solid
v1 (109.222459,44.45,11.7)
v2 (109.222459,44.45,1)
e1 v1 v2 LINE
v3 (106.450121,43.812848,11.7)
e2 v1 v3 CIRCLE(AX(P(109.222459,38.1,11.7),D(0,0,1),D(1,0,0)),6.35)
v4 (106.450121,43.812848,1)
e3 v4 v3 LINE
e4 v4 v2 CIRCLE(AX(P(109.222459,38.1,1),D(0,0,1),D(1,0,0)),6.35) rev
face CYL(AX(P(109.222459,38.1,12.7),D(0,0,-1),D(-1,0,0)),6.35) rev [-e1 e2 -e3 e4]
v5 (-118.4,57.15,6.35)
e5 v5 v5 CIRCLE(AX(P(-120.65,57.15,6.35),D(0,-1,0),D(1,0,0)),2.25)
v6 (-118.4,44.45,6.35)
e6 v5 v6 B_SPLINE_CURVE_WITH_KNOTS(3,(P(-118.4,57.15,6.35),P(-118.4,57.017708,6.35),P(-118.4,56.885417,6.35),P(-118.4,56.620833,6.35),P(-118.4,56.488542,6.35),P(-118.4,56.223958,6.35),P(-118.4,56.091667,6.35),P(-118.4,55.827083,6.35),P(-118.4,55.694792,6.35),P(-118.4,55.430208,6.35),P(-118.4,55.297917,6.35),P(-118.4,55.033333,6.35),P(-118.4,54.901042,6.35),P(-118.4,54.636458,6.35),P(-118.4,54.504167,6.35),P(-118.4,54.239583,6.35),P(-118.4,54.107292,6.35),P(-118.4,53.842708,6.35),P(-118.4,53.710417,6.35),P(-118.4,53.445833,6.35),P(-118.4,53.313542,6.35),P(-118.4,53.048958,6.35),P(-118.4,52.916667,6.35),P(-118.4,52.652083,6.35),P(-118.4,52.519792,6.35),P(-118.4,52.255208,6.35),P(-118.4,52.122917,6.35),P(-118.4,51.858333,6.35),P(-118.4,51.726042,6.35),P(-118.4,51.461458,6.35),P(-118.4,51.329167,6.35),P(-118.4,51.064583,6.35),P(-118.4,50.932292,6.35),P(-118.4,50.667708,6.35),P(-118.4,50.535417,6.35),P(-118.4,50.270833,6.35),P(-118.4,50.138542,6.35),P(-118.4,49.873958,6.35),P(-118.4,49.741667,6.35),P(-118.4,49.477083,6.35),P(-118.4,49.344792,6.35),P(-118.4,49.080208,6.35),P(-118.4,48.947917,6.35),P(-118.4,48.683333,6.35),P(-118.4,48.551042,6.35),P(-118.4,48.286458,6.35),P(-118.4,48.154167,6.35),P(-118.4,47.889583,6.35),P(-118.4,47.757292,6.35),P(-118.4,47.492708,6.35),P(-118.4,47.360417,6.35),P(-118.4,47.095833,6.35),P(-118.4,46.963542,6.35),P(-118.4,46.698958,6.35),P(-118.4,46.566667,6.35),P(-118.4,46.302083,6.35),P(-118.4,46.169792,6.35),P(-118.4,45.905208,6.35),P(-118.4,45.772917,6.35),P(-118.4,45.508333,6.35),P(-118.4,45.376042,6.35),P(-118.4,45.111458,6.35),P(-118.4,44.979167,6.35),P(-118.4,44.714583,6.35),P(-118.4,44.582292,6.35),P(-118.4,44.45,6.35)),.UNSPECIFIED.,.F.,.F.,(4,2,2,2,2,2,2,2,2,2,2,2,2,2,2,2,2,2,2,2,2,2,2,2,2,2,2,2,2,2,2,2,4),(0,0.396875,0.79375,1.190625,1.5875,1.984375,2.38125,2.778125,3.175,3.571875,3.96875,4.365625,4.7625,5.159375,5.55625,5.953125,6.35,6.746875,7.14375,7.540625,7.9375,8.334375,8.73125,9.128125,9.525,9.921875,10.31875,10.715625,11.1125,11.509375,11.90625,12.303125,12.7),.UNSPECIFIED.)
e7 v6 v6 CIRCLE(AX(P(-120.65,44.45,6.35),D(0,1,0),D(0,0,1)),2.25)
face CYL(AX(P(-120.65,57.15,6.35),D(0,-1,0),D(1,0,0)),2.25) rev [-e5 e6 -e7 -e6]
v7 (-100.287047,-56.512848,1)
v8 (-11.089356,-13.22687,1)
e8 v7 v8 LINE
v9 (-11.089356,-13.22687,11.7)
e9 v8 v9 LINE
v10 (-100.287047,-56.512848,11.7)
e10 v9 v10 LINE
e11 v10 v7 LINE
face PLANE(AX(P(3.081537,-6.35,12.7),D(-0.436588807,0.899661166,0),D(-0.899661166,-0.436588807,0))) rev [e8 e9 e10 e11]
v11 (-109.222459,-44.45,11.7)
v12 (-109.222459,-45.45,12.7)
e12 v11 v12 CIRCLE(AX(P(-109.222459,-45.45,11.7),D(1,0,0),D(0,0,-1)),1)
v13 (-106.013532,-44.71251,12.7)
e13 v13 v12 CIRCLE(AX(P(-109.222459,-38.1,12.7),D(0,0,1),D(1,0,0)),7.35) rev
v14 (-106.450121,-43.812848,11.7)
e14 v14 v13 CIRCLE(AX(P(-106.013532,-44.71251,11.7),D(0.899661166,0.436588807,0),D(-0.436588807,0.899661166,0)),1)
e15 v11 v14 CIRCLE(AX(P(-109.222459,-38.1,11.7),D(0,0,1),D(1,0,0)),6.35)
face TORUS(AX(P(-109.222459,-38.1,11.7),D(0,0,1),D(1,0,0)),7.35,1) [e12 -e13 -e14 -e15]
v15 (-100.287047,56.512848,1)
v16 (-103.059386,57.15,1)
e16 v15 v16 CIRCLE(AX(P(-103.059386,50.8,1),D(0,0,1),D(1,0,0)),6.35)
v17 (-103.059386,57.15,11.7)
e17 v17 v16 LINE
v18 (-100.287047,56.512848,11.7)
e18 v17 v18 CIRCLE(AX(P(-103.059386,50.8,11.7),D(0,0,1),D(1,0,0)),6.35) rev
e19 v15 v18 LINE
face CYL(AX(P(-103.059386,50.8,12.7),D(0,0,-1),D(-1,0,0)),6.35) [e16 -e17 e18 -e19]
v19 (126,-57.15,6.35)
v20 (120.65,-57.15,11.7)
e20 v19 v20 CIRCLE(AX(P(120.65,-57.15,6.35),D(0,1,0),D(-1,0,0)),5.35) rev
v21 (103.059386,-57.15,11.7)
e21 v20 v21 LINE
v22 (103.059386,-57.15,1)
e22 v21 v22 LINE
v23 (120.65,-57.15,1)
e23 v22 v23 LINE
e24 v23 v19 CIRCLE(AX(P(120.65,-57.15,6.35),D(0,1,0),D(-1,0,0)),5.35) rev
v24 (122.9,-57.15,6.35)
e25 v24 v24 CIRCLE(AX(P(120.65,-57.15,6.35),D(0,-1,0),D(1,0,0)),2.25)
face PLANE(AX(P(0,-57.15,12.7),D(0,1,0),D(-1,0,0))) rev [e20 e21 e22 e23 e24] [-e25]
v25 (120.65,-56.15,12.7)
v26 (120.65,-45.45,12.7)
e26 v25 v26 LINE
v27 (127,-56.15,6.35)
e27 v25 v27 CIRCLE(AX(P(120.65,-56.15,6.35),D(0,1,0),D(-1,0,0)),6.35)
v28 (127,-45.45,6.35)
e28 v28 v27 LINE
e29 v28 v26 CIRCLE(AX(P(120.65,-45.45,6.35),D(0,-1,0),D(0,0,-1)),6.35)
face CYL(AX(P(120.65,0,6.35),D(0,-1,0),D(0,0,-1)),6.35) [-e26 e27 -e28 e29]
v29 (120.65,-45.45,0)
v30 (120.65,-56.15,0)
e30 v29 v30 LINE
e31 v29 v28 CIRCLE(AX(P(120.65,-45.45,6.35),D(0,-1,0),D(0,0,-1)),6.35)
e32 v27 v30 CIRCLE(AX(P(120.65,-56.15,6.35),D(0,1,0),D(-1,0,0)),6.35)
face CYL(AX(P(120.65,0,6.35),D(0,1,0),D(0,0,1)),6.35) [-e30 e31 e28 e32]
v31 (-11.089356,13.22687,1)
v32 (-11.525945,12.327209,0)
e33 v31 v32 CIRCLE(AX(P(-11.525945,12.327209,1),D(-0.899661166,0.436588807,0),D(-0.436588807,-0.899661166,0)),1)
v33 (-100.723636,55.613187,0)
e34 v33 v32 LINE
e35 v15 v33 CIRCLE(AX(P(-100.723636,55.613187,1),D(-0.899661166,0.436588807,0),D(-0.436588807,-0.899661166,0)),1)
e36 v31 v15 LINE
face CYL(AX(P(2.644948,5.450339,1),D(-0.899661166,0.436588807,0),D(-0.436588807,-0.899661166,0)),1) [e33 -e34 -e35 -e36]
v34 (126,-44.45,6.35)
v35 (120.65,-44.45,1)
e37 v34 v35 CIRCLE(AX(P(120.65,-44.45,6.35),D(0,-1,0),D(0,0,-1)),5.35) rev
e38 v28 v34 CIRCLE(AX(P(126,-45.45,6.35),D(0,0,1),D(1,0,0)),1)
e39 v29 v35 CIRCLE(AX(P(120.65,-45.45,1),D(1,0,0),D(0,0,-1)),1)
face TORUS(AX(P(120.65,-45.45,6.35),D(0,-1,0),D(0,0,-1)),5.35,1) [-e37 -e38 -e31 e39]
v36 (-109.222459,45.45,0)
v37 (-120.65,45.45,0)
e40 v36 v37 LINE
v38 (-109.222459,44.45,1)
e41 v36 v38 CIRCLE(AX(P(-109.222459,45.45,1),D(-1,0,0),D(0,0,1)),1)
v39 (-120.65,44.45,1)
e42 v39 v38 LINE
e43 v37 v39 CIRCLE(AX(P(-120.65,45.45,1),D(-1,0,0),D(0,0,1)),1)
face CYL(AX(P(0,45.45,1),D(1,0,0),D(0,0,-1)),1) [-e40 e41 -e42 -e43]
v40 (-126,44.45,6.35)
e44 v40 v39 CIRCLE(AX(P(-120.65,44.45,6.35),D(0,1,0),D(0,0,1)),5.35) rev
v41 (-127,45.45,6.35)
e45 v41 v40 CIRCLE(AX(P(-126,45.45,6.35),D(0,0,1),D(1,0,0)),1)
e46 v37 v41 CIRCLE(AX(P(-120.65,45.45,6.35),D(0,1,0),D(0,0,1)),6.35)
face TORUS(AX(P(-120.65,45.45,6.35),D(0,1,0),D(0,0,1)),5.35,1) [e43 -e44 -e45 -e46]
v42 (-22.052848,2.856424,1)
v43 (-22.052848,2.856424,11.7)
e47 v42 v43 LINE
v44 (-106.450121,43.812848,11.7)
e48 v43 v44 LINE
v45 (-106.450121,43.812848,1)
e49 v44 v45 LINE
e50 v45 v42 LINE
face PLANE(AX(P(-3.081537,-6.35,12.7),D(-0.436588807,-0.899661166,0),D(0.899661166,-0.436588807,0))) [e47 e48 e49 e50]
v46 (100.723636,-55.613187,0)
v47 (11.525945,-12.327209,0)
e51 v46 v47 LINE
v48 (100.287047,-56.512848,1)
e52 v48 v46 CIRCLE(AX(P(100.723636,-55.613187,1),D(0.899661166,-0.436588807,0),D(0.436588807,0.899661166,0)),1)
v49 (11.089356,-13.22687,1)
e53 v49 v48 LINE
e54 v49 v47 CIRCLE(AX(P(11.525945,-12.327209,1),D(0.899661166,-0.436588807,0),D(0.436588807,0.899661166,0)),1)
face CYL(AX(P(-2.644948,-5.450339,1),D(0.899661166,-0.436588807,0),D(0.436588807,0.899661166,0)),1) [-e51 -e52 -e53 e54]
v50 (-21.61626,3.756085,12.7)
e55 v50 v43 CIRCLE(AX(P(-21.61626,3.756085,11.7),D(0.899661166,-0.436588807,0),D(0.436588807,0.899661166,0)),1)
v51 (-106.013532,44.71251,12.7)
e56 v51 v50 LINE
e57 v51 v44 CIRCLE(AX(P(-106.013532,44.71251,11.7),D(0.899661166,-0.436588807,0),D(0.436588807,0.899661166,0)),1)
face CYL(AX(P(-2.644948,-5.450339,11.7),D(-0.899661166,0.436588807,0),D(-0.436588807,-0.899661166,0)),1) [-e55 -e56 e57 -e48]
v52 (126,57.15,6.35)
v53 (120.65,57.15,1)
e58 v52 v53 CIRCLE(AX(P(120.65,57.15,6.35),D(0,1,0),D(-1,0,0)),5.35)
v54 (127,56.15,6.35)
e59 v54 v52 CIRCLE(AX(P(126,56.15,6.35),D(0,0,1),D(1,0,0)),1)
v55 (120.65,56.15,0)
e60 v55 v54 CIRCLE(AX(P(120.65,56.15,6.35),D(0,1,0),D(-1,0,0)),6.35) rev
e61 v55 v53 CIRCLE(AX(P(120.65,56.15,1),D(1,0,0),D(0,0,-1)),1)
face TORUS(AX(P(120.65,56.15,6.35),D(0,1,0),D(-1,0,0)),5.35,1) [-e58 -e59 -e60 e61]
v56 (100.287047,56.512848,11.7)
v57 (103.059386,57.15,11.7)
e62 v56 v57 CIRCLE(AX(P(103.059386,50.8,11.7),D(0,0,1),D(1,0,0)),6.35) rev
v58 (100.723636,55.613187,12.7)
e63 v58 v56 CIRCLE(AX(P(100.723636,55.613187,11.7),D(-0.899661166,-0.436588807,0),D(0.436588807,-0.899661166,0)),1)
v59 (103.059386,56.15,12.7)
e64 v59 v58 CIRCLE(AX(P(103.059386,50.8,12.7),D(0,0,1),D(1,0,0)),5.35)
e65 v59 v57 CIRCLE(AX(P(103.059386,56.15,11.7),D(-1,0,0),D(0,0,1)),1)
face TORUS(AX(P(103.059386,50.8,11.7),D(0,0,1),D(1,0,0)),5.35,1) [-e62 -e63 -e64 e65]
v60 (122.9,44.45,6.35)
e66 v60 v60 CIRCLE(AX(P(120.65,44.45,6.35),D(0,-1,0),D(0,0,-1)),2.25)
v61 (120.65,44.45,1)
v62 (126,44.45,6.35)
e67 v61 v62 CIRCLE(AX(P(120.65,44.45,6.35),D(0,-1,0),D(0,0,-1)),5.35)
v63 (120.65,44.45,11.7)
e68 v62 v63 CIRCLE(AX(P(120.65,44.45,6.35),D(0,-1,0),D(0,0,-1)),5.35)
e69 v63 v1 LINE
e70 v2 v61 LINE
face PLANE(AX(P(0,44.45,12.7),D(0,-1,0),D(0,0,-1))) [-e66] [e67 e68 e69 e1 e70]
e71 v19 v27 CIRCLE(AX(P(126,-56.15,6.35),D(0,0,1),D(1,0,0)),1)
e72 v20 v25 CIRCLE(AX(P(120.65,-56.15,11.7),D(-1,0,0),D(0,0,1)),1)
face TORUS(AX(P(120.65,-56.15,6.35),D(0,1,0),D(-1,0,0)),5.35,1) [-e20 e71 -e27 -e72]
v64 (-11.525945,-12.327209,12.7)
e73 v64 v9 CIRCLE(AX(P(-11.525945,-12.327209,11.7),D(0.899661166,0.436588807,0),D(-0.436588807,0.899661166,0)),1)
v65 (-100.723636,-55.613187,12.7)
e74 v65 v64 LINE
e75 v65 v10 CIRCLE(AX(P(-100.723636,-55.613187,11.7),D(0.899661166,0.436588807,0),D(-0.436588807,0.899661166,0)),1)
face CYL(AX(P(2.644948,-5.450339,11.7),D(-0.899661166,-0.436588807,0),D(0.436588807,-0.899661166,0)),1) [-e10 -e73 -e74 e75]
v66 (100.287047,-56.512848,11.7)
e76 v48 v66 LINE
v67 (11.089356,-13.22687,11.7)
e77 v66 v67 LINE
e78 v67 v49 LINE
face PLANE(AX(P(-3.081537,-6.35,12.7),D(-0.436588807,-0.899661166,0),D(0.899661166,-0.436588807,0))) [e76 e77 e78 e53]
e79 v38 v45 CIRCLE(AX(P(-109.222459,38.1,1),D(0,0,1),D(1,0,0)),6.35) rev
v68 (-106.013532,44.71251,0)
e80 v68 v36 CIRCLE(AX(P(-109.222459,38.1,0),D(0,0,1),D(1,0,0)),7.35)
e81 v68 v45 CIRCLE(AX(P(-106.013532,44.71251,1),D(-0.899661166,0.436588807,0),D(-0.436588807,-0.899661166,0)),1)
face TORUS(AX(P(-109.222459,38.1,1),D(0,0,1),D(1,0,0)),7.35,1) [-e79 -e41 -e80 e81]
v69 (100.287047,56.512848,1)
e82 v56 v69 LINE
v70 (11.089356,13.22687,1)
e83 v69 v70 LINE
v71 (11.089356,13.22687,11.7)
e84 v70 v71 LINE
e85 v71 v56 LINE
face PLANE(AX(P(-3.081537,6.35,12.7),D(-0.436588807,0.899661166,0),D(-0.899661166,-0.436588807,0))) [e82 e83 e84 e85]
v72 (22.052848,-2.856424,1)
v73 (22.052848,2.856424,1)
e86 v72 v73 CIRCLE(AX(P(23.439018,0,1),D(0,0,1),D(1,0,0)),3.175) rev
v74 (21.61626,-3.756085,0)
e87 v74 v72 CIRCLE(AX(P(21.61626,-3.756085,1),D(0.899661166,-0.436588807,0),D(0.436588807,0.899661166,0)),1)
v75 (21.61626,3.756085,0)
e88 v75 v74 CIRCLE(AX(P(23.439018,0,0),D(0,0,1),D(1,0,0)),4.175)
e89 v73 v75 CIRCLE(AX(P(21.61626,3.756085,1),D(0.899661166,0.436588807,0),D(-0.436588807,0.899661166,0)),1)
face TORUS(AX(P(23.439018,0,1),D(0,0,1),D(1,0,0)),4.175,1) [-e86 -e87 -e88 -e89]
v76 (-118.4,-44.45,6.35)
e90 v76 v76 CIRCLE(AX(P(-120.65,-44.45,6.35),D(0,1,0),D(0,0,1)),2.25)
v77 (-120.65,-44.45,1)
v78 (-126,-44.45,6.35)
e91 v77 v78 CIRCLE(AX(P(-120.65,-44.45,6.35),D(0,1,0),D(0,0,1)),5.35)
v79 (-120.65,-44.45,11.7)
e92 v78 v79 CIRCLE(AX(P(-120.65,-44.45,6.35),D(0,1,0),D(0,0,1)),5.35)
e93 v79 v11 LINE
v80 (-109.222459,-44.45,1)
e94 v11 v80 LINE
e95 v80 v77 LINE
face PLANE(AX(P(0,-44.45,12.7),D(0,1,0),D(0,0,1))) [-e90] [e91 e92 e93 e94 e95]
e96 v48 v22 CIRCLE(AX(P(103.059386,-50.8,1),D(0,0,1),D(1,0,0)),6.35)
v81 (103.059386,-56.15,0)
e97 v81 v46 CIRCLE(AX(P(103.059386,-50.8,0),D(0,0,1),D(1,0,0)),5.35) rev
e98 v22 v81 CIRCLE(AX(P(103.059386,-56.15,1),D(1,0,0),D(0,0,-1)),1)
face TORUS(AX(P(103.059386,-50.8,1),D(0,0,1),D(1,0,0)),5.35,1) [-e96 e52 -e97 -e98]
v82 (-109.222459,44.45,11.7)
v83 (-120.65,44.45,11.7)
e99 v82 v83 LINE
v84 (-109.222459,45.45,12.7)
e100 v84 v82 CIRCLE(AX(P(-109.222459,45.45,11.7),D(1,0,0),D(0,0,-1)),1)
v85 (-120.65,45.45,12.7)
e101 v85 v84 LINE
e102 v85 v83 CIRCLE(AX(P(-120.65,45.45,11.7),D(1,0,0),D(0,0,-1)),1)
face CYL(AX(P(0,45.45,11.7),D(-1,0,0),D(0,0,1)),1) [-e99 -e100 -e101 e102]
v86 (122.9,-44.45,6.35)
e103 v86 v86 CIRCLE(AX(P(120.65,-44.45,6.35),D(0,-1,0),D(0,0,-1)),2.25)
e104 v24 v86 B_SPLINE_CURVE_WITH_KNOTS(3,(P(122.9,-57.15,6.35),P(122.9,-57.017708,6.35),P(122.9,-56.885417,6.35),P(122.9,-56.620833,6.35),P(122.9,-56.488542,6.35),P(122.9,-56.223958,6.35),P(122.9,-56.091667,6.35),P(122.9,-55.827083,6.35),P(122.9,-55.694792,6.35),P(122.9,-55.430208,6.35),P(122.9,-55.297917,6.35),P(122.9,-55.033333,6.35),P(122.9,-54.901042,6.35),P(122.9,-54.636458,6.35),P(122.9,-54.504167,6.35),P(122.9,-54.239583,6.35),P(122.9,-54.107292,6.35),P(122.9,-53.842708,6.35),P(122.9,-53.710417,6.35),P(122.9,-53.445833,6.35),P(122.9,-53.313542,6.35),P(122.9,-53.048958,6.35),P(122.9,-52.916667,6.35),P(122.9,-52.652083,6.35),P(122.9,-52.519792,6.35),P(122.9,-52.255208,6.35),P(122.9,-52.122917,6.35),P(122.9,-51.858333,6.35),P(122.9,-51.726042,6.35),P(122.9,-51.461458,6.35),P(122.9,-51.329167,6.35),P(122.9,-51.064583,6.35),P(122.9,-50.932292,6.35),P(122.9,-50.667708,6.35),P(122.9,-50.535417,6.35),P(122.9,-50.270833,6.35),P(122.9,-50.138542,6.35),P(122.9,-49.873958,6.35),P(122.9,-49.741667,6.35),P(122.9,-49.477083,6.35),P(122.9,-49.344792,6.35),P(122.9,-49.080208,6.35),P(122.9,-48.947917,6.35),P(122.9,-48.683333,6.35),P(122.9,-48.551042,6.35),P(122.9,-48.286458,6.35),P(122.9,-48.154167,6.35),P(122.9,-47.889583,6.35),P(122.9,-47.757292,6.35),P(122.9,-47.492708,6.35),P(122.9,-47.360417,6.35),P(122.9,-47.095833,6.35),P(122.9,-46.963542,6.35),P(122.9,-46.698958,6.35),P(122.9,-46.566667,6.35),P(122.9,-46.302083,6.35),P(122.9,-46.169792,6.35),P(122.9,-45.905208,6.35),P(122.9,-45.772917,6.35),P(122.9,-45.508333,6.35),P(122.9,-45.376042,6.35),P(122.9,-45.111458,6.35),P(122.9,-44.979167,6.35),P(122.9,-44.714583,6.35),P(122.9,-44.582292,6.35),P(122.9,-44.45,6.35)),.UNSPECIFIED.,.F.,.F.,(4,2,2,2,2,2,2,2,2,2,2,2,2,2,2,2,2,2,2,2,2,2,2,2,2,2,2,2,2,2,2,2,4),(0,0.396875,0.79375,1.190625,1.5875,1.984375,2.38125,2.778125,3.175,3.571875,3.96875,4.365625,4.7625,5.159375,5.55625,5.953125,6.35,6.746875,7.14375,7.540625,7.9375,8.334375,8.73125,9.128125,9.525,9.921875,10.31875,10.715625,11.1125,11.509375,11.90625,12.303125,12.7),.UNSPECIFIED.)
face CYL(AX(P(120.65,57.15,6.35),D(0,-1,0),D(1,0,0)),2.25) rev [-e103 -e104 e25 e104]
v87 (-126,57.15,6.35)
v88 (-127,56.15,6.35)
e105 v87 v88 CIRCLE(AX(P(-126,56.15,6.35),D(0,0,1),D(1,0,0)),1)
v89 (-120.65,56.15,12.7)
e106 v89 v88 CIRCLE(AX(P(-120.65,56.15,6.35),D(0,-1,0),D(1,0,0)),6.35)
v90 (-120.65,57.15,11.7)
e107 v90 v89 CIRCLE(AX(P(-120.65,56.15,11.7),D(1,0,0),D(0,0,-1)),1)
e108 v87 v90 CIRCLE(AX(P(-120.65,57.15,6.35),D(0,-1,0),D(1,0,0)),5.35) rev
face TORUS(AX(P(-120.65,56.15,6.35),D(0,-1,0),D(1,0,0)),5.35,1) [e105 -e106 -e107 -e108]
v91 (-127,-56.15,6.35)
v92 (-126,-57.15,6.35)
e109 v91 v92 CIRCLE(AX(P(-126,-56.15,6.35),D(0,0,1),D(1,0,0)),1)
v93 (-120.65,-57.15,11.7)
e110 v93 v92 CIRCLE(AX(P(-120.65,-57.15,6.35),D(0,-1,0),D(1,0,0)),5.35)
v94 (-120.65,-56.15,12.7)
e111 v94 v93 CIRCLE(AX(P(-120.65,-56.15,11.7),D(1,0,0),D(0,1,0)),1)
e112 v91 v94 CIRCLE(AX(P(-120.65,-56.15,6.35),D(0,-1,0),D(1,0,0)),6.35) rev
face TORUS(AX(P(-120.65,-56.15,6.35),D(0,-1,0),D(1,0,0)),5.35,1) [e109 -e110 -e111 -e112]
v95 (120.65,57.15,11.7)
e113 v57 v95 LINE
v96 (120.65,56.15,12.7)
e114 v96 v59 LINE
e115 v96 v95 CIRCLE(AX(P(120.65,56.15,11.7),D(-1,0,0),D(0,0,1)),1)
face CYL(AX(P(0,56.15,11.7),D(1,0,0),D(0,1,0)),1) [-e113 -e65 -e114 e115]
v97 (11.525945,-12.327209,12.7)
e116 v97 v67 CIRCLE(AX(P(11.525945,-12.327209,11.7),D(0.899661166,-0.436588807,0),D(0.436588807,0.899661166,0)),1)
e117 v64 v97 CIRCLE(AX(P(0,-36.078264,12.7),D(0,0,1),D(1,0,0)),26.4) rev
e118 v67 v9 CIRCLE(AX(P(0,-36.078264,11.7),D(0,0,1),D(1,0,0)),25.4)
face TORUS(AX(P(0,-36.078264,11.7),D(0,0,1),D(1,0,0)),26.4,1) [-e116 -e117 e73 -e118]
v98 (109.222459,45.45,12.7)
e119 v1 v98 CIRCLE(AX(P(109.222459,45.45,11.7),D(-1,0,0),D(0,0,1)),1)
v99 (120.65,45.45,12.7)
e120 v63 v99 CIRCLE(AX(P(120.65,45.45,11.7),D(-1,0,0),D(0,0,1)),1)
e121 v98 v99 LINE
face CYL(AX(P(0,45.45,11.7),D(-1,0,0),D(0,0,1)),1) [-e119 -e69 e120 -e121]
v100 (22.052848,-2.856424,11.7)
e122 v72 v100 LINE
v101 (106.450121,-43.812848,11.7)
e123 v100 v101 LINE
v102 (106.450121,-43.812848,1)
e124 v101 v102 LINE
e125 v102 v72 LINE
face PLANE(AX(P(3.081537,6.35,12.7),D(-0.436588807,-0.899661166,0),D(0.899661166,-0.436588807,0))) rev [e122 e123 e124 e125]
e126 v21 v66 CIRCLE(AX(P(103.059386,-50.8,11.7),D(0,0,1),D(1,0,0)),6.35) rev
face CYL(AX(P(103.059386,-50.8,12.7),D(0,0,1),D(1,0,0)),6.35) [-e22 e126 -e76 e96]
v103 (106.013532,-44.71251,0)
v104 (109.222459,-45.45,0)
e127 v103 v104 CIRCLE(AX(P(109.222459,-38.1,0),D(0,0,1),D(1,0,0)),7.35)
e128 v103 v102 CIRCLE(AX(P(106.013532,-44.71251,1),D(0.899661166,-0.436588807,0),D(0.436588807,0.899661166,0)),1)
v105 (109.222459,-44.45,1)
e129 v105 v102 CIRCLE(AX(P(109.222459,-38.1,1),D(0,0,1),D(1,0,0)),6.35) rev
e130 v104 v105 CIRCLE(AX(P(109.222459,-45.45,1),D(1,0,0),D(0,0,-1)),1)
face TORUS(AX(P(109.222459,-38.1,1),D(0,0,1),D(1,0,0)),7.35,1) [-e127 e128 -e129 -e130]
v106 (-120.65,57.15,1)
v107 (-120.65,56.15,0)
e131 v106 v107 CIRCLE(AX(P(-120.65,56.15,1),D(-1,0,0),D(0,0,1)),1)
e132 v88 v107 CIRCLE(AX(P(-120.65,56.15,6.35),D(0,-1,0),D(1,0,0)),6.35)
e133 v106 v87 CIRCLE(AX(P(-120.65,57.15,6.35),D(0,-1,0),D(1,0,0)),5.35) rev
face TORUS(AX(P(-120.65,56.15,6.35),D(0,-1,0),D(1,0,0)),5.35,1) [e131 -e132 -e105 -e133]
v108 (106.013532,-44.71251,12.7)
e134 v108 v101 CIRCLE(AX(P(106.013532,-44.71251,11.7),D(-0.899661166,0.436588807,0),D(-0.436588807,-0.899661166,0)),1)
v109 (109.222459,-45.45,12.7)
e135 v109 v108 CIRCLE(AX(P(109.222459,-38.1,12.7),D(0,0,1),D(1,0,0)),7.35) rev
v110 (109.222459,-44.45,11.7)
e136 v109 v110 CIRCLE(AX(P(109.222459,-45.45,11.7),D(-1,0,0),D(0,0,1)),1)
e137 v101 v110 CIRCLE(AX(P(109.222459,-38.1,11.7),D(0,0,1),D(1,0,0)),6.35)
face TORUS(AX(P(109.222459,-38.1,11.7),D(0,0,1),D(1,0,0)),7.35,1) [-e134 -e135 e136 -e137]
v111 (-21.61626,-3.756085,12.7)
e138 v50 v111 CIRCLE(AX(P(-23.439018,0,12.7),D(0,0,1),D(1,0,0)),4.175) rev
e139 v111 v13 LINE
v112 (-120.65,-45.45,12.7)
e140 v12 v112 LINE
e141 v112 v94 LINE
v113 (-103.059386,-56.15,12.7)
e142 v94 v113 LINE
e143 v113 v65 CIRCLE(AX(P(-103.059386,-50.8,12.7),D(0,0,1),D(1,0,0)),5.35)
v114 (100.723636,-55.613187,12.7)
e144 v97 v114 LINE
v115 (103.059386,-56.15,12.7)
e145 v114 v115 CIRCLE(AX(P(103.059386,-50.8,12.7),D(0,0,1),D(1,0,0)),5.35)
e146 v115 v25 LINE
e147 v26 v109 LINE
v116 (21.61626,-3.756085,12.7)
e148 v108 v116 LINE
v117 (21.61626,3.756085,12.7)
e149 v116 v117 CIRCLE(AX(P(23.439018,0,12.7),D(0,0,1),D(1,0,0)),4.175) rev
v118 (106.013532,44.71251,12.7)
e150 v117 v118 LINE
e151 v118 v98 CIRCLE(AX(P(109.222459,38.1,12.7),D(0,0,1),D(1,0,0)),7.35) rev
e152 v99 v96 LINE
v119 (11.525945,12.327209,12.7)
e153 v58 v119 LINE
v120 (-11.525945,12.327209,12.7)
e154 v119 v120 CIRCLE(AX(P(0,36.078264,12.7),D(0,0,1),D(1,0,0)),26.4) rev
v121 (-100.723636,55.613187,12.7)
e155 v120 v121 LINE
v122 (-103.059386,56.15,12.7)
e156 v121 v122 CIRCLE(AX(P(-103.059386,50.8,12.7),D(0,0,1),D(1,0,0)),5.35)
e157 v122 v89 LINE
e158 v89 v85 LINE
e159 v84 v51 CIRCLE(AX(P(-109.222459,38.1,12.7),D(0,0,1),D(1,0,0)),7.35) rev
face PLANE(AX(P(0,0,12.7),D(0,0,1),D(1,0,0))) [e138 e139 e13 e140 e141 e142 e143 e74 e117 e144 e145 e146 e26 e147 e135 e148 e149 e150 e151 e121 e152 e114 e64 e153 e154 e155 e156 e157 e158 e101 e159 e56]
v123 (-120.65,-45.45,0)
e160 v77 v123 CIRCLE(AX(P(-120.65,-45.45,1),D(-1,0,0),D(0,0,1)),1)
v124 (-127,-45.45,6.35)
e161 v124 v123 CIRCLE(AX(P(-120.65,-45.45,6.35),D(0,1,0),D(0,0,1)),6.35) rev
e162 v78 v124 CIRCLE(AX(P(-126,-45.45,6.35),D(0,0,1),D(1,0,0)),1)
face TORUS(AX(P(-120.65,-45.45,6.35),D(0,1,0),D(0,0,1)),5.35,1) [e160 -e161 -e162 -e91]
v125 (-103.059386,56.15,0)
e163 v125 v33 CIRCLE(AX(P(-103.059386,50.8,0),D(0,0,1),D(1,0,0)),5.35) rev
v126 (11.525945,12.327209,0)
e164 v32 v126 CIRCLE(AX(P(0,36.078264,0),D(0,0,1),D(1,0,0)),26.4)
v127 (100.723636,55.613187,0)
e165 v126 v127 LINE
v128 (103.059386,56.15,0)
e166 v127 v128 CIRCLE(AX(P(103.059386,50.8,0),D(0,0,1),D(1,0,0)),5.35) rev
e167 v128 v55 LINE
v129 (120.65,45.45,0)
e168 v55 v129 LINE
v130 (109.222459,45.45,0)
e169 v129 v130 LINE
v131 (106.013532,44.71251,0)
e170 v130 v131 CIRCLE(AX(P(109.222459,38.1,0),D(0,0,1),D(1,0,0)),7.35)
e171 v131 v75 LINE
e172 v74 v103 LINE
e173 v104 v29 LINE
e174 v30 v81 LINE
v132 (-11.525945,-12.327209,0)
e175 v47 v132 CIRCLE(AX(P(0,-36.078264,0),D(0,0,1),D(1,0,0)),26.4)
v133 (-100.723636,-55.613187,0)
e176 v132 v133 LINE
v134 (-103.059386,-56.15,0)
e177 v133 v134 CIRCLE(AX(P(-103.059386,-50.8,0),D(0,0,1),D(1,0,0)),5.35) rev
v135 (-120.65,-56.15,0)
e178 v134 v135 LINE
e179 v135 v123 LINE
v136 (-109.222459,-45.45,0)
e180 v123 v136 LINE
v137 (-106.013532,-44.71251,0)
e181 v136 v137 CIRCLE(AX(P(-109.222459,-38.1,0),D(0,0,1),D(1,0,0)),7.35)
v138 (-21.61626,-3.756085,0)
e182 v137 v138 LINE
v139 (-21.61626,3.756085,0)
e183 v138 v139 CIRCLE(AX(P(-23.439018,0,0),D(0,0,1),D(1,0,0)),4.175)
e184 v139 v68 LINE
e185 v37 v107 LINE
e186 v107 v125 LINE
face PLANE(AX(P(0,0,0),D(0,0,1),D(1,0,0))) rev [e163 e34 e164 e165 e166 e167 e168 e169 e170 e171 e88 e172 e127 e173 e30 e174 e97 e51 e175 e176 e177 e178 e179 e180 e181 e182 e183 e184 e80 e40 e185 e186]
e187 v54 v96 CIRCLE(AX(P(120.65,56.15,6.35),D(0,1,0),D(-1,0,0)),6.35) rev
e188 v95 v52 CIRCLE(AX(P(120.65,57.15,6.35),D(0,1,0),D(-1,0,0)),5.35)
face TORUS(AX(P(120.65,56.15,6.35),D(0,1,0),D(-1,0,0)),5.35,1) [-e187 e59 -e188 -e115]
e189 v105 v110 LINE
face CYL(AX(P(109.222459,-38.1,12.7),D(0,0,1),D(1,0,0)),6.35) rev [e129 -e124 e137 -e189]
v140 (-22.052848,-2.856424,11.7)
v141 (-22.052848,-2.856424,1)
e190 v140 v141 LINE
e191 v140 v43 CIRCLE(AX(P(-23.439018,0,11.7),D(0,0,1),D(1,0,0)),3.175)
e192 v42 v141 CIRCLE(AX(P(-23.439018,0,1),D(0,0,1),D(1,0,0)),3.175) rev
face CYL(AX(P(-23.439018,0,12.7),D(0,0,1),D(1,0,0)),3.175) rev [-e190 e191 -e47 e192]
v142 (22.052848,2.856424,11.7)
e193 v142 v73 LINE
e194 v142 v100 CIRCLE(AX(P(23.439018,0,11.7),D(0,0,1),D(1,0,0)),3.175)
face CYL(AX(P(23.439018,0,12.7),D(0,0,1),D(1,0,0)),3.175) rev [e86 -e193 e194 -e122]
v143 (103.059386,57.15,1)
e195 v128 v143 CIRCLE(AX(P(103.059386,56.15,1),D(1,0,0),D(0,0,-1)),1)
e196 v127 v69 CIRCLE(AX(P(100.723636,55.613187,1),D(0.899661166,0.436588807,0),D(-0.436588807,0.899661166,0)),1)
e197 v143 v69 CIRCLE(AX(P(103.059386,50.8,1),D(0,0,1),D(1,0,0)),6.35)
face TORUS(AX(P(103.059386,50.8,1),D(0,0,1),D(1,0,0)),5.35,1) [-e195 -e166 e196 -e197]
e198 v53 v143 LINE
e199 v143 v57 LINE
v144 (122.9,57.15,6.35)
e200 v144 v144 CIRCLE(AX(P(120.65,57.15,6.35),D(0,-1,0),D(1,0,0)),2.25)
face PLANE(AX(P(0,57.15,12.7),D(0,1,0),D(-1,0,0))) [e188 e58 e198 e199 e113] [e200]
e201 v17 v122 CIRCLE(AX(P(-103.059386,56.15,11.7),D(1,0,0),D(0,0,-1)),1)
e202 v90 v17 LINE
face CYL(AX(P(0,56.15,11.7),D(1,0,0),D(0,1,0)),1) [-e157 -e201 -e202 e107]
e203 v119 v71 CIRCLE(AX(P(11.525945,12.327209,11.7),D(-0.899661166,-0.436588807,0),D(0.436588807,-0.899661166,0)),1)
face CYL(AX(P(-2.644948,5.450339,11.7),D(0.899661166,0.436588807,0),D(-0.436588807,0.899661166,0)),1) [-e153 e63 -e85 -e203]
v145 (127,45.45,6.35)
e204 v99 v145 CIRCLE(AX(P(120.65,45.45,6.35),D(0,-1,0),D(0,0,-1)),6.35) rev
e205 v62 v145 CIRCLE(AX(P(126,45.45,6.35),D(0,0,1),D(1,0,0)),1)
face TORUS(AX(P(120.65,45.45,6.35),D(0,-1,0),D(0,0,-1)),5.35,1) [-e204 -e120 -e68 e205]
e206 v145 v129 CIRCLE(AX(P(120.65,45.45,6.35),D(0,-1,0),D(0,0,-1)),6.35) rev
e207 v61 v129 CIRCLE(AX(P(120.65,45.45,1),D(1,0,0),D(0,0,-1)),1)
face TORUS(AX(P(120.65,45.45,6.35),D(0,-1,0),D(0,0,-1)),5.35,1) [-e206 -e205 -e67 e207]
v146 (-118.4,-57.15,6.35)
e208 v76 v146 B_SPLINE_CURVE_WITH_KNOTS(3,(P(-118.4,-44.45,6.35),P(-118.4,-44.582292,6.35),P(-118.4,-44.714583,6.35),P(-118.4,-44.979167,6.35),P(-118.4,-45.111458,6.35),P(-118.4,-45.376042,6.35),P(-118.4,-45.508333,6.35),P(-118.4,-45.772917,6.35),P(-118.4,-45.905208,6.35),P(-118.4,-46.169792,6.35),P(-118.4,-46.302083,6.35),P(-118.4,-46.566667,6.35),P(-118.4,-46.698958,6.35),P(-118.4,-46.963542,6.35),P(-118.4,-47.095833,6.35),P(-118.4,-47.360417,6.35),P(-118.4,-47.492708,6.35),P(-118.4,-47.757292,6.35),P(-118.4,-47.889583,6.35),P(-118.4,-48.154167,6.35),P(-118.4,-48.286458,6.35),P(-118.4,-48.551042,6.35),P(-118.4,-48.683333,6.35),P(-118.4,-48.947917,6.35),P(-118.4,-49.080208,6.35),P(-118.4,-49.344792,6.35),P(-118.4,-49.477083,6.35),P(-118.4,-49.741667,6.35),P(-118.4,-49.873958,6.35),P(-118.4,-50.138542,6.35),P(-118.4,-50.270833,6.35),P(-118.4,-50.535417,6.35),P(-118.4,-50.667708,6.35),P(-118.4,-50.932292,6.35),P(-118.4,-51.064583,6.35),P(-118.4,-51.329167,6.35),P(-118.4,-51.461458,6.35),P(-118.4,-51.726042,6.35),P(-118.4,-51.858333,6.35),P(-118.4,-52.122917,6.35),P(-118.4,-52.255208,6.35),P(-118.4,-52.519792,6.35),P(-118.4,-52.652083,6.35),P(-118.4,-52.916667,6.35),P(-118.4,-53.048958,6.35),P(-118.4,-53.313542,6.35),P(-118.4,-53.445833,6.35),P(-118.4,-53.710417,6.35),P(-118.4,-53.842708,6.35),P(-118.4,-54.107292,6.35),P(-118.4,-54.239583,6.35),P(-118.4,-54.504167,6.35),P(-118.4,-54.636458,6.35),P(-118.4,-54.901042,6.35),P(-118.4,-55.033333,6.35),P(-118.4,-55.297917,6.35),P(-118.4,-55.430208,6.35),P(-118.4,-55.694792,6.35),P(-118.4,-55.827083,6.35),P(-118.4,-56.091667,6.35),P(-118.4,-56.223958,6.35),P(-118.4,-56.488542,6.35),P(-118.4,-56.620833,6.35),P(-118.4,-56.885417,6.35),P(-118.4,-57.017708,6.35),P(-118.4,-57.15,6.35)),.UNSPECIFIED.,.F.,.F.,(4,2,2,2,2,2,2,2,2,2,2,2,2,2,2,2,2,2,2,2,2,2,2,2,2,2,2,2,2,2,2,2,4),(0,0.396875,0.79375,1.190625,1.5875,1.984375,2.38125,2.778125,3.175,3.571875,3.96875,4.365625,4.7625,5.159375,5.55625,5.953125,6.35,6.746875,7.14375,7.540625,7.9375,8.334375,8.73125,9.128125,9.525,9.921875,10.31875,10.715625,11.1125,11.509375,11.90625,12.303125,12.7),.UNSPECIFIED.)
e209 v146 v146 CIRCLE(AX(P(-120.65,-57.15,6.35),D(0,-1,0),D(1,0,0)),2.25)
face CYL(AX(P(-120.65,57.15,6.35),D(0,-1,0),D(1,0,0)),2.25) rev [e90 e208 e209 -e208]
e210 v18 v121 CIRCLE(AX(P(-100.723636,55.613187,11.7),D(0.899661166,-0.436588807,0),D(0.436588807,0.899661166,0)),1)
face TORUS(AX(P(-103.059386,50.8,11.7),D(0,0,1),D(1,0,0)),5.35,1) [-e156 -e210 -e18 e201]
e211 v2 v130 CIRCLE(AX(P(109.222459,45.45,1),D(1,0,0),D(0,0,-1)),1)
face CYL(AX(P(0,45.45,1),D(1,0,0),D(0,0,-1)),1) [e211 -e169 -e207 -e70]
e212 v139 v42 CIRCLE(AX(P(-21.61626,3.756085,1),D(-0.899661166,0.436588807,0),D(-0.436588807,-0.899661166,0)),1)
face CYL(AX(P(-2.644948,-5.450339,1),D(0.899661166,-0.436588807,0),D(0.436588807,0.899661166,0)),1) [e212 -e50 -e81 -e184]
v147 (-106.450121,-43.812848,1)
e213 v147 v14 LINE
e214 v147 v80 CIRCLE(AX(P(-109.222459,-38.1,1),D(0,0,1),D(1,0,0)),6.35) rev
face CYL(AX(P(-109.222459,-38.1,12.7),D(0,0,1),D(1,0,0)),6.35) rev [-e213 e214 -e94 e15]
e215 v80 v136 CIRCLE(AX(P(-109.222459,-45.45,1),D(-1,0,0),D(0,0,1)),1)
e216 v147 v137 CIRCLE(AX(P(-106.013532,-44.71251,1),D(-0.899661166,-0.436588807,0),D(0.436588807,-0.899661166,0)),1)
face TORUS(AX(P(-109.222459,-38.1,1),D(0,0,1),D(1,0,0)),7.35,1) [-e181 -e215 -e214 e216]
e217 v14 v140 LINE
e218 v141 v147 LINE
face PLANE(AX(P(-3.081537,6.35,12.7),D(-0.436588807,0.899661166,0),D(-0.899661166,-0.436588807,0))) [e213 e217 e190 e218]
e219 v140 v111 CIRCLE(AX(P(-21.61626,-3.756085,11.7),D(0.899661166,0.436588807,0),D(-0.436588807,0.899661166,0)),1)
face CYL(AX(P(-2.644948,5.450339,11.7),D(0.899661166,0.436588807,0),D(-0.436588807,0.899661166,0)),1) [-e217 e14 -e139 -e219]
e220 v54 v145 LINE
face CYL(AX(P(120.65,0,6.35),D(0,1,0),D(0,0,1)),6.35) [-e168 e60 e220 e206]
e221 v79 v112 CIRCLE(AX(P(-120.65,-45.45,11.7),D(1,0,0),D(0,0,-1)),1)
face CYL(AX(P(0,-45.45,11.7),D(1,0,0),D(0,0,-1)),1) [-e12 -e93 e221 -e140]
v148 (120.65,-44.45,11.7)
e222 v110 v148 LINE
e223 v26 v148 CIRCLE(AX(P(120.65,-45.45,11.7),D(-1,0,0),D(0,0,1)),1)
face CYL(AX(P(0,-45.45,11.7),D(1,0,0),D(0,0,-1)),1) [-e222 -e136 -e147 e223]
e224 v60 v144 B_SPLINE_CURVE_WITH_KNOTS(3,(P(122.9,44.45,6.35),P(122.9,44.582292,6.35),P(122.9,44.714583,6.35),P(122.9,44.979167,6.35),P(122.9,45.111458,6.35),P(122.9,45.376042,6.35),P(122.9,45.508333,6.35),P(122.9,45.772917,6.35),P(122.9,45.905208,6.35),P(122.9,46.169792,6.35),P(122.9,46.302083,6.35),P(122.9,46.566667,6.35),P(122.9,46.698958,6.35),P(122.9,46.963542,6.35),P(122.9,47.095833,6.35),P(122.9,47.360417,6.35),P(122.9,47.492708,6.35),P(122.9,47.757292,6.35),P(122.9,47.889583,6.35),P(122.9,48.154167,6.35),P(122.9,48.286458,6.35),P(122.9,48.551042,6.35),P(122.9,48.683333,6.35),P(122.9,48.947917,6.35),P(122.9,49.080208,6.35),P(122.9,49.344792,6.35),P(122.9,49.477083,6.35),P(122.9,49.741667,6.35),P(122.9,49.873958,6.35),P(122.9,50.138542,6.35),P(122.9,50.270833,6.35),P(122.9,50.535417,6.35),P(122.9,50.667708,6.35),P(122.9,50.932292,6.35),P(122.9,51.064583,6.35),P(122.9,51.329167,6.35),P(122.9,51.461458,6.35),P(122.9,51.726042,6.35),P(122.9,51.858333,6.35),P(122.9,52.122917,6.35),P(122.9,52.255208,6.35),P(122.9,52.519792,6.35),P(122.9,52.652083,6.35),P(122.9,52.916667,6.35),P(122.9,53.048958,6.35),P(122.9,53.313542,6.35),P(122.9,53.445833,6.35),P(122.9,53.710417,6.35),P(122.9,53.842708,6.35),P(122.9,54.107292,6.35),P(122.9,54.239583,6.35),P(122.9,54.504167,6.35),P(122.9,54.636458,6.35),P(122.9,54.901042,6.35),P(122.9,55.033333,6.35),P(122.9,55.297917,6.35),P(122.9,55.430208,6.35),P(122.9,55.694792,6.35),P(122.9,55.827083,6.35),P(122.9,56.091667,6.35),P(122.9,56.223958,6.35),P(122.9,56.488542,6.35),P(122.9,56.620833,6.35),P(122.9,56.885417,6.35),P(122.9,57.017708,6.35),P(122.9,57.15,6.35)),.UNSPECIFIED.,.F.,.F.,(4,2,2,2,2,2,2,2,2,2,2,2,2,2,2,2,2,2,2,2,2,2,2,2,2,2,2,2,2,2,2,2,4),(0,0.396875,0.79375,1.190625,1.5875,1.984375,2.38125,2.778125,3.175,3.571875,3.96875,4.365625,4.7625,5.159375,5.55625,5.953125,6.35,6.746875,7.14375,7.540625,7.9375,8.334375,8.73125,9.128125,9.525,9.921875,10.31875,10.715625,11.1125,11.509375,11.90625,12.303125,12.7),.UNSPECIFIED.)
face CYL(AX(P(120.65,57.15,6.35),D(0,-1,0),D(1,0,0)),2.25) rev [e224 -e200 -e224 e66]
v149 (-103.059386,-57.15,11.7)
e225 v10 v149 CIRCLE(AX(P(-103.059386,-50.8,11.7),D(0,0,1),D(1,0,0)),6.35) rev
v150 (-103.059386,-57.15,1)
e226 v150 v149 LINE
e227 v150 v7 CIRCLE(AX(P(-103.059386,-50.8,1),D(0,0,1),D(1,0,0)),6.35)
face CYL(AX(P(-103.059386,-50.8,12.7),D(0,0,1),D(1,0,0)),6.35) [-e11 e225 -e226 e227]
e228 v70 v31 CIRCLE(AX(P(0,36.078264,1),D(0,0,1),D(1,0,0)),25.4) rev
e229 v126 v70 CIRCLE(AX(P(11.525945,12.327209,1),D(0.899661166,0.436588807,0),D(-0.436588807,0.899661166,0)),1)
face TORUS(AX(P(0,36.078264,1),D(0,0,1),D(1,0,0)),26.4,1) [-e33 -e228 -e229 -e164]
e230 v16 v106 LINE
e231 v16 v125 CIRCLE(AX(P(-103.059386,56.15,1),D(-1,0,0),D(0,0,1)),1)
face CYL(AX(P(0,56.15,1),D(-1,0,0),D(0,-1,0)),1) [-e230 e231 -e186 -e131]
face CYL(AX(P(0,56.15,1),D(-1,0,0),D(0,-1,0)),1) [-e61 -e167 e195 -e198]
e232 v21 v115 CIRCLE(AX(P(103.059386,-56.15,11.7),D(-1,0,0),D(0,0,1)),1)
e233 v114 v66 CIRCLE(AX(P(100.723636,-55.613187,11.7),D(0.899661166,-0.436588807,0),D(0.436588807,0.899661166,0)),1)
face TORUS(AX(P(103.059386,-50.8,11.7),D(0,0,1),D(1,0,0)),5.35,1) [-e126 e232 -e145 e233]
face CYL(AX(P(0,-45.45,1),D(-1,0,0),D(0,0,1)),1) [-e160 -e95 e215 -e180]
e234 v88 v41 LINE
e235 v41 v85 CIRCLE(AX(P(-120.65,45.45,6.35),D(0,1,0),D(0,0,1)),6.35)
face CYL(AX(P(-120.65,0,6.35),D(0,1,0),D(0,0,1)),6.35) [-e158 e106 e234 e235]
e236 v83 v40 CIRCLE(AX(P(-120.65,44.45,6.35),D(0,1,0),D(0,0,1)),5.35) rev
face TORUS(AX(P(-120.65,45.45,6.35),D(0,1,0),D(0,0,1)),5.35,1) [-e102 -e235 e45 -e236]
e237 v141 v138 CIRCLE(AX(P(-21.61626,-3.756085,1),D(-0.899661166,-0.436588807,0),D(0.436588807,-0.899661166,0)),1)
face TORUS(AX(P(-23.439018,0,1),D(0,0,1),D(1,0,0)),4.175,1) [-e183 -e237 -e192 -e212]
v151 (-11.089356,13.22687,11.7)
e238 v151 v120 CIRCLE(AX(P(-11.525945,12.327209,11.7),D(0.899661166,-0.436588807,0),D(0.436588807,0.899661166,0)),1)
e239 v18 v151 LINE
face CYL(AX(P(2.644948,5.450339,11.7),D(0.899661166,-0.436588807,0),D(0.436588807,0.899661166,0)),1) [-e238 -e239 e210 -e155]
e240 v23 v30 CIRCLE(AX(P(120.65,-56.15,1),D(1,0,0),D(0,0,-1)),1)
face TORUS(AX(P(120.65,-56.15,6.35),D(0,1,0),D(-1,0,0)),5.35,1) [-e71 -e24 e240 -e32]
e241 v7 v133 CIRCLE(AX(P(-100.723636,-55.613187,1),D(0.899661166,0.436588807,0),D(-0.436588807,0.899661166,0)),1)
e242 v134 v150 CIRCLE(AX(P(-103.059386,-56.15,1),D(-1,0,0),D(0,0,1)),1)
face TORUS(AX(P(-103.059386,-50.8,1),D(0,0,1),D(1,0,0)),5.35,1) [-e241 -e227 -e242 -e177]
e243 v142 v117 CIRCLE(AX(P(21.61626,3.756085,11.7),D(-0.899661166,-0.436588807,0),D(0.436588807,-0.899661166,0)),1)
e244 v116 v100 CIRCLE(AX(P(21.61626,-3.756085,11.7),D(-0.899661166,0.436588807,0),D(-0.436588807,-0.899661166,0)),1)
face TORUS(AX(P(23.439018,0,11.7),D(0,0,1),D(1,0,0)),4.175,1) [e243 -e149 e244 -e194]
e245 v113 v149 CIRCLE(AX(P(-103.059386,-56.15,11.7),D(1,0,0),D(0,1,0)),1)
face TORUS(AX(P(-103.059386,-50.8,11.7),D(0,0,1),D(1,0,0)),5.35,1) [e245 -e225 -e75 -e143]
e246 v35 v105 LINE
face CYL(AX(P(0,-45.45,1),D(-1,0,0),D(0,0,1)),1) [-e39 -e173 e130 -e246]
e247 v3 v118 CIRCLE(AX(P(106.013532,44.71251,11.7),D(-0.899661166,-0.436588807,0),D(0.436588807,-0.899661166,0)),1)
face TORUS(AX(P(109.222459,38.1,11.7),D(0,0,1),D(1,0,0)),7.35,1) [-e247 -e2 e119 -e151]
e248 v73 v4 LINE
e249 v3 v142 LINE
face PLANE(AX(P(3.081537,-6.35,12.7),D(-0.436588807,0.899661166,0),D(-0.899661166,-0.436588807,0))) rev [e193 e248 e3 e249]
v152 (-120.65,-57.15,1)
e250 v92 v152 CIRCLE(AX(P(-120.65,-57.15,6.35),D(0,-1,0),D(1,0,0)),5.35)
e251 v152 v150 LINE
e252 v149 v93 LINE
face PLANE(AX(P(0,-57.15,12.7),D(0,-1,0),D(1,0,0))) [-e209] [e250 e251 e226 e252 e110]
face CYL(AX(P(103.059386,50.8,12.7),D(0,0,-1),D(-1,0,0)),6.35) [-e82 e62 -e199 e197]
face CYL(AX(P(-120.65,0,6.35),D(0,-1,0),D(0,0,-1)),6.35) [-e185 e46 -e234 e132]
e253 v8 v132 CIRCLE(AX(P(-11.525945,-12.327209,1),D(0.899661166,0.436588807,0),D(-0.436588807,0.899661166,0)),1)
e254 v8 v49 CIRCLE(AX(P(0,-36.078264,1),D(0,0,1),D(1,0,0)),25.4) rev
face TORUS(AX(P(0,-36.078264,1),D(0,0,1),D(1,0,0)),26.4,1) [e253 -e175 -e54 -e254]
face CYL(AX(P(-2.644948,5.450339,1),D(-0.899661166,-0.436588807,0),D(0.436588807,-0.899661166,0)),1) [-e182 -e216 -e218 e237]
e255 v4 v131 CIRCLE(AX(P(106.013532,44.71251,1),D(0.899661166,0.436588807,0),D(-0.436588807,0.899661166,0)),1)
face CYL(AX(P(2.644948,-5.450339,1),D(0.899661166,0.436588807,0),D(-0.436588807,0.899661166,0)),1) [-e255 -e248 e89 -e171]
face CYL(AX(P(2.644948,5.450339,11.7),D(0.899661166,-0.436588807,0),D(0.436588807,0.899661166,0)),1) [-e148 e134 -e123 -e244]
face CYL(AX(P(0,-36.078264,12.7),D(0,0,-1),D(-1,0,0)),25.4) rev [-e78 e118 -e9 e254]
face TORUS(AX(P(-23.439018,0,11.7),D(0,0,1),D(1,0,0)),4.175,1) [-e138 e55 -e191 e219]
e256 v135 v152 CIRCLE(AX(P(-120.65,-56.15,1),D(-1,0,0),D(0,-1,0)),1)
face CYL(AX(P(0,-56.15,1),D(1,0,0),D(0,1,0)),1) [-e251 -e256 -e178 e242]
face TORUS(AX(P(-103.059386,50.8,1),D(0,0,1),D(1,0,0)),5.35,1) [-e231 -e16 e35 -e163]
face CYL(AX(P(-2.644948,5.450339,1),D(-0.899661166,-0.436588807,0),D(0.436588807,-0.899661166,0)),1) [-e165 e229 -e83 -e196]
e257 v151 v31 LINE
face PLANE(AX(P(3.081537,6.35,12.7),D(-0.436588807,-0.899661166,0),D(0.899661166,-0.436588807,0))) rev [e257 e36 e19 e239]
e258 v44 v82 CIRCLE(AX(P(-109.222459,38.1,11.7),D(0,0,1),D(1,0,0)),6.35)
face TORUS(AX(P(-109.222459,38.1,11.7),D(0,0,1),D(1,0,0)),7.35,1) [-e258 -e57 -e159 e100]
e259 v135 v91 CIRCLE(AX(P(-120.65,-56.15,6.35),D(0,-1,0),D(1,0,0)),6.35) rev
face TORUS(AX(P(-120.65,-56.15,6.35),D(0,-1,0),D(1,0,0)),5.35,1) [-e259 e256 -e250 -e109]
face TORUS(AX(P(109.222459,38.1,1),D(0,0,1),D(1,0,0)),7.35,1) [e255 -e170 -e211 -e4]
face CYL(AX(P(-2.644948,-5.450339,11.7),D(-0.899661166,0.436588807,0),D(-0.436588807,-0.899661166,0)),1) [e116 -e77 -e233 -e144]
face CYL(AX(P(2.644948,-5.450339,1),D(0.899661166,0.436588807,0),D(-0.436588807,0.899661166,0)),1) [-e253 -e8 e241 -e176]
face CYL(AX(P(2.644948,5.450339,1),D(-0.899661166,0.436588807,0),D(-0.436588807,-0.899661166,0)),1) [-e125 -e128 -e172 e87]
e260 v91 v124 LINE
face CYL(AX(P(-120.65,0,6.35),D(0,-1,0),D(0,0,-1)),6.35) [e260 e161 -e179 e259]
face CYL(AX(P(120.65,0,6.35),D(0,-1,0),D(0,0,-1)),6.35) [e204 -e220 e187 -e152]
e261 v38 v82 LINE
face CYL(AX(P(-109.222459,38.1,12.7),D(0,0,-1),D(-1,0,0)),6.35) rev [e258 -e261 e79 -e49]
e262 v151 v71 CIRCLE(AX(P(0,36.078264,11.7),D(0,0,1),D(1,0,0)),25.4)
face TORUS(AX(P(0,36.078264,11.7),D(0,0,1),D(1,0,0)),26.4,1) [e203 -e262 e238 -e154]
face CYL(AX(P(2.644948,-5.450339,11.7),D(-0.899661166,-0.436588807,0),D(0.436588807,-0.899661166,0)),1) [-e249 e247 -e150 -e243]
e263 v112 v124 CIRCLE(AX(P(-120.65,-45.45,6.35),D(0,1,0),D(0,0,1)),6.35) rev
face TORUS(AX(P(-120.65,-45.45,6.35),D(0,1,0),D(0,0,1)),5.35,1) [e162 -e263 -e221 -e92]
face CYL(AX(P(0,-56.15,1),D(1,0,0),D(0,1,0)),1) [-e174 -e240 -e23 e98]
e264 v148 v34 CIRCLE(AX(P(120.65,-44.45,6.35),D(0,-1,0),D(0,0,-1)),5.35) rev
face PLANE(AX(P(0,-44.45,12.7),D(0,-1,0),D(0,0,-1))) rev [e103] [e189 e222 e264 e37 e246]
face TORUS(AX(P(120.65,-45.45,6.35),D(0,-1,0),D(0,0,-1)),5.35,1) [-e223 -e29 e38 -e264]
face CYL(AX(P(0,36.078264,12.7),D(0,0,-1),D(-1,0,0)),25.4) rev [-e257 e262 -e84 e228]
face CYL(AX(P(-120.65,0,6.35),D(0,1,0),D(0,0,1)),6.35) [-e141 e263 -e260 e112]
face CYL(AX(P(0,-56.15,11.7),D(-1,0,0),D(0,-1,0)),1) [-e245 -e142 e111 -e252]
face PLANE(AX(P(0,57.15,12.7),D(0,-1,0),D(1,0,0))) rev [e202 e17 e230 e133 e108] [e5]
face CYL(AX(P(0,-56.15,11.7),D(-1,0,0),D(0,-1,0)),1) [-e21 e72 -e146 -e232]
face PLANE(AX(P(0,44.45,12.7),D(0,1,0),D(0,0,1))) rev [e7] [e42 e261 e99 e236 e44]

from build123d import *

# Parameters (mm, degrees)
BOSS_EXTRUDE1_DEPTH = 12.7
FILLET1_R           = 6.35
SKETCH2_R           = 2.25
CUT_EXTRUDE1_DEPTH  = 172.332367053
FILLET4_R           = 25.4
FILLET5_R           = 3.175
FILLET2_R           = 6.35
FILLET3_R           = 1


with BuildPart() as part:
    # Sketch1 → Boss-Extrude1 (new body)
    with BuildSketch(Plane.XY):
        Polygon((-107.763073453, 44.45), (-16.166728817, 0), (0, 7.845412377), (-101.6, 57.15), (-127, 57.15), (-127, 44.45), align=None)
        Polygon((0, 7.845412377), (16.166728817, 0), (107.763073453, 44.45), (127, 44.45), (127, 57.15), (101.6, 57.15), align=None)
        Polygon((0, -7.845412377), (101.6, -57.15), (127, -57.15), (127, -44.45), (107.763073453, -44.45), (16.166728817, 0), align=None)
        Polygon((-101.6, -57.15), (0, -7.845412377), (-16.166728817, 0), (-107.763073453, -44.45), (-127, -44.45), (-127, -57.15), align=None)
        Polygon((-16.166728817, 0), (0, -7.845412377), (16.166728817, 0), (0, 7.845412377), align=None)
    extrude(amount=BOSS_EXTRUDE1_DEPTH)

    # Fillet1
    fillet1_edges = [part.edges().sort_by_distance(p)[0] for p in [
        (127, -50.8, 0),
        (127, -50.8, 12.7),
        (127, 50.8, 0),
        (127, 50.8, 12.7),
        (-127, 50.8, 0),
        (-127, 50.8, 12.7),
        (-127, -50.8, 0),
        (-127, -50.8, 12.7),
    ]]
    fillet(fillet1_edges, radius=FILLET1_R - 0.0001)  # a hair under: the kernel refuses the full size

    # Sketch2 → Cut-Extrude1 (cut, through all)
    with BuildSketch(Plane.XZ.offset(57.15)):
        with Locations((-120.65, 6.35)):
            Circle(SKETCH2_R)
        with Locations((120.65, 6.35)):
            Circle(SKETCH2_R)
    extrude(amount=-CUT_EXTRUDE1_DEPTH, mode=Mode.SUBTRACT)

    # Fillet4
    fillet4_edges = [part.edges().sort_by_distance(p)[0] for p in [
        (0, 7.845412377, 6.35),
        (0, -7.845412377, 6.35),
    ]]
    fillet(fillet4_edges, radius=FILLET4_R)

    # Fillet5
    fillet5_edges = [part.edges().sort_by_distance(p)[0] for p in [
        (16.166728817, 0, 6.35),
        (-16.166728817, 0, 6.35),
    ]]
    fillet(fillet5_edges, radius=FILLET5_R)

    # Fillet2
    fillet2_edges = [part.edges().sort_by_distance(p)[0] for p in [
        (-101.6, 57.15, 6.35),
        (101.6, 57.15, 6.35),
        (107.763073453, 44.45, 6.35),
        (107.763073453, -44.45, 6.35),
        (101.6, -57.15, 6.35),
        (-101.6, -57.15, 6.35),
        (-107.763073453, -44.45, 6.35),
        (-107.763073453, 44.45, 6.35),
    ]]
    fillet(fillet2_edges, radius=FILLET2_R)

    # Fillet3
    fillet3_edges = [part.edges().sort_by_distance(p)[0] for p in [
        (-55.68820139, 34.869859277, 0),
        (-55.68820139, 34.869859277, 12.7),
        (55.68820139, 34.869859277, 0),
        (55.68820139, 34.869859277, 12.7),
        (0, 10.678263766, 0),
        (0, 10.678263766, 12.7),
        (0, -10.678263766, 0),
        (0, -10.678263766, 12.7),
        (64.25148447, 23.334636303, 0),
        (64.25148447, 23.334636303, 12.7),
        (-64.25148447, 23.334636303, 0),
        (-64.25148447, 23.334636303, 12.7),
        (20.264017866, 0, 0),
        (20.264017866, 0, 12.7),
        (-20.264017866, 0, 0),
        (-20.264017866, 0, 12.7),
        (-55.68820139, -34.869859277, 0),
        (-55.68820139, -34.869859277, 12.7),
        (111.854743004, -57.15, 0),
        (55.68820139, -34.869859277, 0),
        (-111.854743004, -57.15, 0),
        (-64.25148447, -23.334636303, 0),
        (-111.854743004, 57.15, 0),
        (111.854743004, 57.15, 0),
        (64.25148447, -23.334636303, 0),
        (-101.637079319, 56.988662512, 0),
        (101.637079319, 56.988662512, 0),
        (101.637079319, -56.988662512, 0),
        (-101.637079319, -56.988662512, 0),
        (-111.854743004, -57.15, 12.7),
        (111.854743004, -57.15, 12.7),
        (64.25148447, -23.334636303, 12.7),
        (111.854743004, 57.15, 12.7),
        (-111.854743004, 57.15, 12.7),
        (-64.25148447, -23.334636303, 12.7),
        (55.68820139, -34.869859277, 12.7),
        (-101.637079319, 56.988662512, 12.7),
        (101.637079319, 56.988662512, 12.7),
        (101.637079319, -56.988662512, 12.7),
        (-101.637079319, -56.988662512, 12.7),
        (107.800152771, -44.288662512, 0),
        (107.800152771, -44.288662512, 12.7),
        (107.800152771, 44.288662512, 0),
        (107.800152771, 44.288662512, 12.7),
        (-107.800152771, -44.288662512, 0),
        (-107.800152771, -44.288662512, 12.7),
        (-107.800152771, 44.288662512, 0),
        (-107.800152771, 44.288662512, 12.7),
        (114.93627973, -44.45, 0),
        (114.93627973, -44.45, 12.7),
        (125.14015735, -44.45, 10.84015735),
        (125.14015735, -44.45, 1.85984265),
        (114.93627973, 44.45, 0),
        (-114.93627973, -44.45, 0),
        (-114.93627973, 44.45, 0),
        (125.14015735, -57.15, 10.84015735),
        (125.14015735, -57.15, 1.85984265),
        (-114.93627973, 44.45, 12.7),
        (-114.93627973, -44.45, 12.7),
        (114.93627973, 44.45, 12.7),
        (125.14015735, 44.45, 10.84015735),
        (125.14015735, 44.45, 1.85984265),
        (125.14015735, 57.15, 10.84015735),
        (125.14015735, 57.15, 1.85984265),
        (-125.14015735, 44.45, 1.85984265),
        (-125.14015735, 44.45, 10.84015735),
        (-125.14015735, 57.15, 1.85984265),
        (-125.14015735, 57.15, 10.84015735),
        (-125.14015735, -44.45, 10.84015735),
        (-125.14015735, -44.45, 1.85984265),
        (-125.14015735, -57.15, 10.84015735),
        (-125.14015735, -57.15, 1.85984265),
    ]]
    fillet(fillet3_edges, radius=FILLET3_R)


solid = part.part
